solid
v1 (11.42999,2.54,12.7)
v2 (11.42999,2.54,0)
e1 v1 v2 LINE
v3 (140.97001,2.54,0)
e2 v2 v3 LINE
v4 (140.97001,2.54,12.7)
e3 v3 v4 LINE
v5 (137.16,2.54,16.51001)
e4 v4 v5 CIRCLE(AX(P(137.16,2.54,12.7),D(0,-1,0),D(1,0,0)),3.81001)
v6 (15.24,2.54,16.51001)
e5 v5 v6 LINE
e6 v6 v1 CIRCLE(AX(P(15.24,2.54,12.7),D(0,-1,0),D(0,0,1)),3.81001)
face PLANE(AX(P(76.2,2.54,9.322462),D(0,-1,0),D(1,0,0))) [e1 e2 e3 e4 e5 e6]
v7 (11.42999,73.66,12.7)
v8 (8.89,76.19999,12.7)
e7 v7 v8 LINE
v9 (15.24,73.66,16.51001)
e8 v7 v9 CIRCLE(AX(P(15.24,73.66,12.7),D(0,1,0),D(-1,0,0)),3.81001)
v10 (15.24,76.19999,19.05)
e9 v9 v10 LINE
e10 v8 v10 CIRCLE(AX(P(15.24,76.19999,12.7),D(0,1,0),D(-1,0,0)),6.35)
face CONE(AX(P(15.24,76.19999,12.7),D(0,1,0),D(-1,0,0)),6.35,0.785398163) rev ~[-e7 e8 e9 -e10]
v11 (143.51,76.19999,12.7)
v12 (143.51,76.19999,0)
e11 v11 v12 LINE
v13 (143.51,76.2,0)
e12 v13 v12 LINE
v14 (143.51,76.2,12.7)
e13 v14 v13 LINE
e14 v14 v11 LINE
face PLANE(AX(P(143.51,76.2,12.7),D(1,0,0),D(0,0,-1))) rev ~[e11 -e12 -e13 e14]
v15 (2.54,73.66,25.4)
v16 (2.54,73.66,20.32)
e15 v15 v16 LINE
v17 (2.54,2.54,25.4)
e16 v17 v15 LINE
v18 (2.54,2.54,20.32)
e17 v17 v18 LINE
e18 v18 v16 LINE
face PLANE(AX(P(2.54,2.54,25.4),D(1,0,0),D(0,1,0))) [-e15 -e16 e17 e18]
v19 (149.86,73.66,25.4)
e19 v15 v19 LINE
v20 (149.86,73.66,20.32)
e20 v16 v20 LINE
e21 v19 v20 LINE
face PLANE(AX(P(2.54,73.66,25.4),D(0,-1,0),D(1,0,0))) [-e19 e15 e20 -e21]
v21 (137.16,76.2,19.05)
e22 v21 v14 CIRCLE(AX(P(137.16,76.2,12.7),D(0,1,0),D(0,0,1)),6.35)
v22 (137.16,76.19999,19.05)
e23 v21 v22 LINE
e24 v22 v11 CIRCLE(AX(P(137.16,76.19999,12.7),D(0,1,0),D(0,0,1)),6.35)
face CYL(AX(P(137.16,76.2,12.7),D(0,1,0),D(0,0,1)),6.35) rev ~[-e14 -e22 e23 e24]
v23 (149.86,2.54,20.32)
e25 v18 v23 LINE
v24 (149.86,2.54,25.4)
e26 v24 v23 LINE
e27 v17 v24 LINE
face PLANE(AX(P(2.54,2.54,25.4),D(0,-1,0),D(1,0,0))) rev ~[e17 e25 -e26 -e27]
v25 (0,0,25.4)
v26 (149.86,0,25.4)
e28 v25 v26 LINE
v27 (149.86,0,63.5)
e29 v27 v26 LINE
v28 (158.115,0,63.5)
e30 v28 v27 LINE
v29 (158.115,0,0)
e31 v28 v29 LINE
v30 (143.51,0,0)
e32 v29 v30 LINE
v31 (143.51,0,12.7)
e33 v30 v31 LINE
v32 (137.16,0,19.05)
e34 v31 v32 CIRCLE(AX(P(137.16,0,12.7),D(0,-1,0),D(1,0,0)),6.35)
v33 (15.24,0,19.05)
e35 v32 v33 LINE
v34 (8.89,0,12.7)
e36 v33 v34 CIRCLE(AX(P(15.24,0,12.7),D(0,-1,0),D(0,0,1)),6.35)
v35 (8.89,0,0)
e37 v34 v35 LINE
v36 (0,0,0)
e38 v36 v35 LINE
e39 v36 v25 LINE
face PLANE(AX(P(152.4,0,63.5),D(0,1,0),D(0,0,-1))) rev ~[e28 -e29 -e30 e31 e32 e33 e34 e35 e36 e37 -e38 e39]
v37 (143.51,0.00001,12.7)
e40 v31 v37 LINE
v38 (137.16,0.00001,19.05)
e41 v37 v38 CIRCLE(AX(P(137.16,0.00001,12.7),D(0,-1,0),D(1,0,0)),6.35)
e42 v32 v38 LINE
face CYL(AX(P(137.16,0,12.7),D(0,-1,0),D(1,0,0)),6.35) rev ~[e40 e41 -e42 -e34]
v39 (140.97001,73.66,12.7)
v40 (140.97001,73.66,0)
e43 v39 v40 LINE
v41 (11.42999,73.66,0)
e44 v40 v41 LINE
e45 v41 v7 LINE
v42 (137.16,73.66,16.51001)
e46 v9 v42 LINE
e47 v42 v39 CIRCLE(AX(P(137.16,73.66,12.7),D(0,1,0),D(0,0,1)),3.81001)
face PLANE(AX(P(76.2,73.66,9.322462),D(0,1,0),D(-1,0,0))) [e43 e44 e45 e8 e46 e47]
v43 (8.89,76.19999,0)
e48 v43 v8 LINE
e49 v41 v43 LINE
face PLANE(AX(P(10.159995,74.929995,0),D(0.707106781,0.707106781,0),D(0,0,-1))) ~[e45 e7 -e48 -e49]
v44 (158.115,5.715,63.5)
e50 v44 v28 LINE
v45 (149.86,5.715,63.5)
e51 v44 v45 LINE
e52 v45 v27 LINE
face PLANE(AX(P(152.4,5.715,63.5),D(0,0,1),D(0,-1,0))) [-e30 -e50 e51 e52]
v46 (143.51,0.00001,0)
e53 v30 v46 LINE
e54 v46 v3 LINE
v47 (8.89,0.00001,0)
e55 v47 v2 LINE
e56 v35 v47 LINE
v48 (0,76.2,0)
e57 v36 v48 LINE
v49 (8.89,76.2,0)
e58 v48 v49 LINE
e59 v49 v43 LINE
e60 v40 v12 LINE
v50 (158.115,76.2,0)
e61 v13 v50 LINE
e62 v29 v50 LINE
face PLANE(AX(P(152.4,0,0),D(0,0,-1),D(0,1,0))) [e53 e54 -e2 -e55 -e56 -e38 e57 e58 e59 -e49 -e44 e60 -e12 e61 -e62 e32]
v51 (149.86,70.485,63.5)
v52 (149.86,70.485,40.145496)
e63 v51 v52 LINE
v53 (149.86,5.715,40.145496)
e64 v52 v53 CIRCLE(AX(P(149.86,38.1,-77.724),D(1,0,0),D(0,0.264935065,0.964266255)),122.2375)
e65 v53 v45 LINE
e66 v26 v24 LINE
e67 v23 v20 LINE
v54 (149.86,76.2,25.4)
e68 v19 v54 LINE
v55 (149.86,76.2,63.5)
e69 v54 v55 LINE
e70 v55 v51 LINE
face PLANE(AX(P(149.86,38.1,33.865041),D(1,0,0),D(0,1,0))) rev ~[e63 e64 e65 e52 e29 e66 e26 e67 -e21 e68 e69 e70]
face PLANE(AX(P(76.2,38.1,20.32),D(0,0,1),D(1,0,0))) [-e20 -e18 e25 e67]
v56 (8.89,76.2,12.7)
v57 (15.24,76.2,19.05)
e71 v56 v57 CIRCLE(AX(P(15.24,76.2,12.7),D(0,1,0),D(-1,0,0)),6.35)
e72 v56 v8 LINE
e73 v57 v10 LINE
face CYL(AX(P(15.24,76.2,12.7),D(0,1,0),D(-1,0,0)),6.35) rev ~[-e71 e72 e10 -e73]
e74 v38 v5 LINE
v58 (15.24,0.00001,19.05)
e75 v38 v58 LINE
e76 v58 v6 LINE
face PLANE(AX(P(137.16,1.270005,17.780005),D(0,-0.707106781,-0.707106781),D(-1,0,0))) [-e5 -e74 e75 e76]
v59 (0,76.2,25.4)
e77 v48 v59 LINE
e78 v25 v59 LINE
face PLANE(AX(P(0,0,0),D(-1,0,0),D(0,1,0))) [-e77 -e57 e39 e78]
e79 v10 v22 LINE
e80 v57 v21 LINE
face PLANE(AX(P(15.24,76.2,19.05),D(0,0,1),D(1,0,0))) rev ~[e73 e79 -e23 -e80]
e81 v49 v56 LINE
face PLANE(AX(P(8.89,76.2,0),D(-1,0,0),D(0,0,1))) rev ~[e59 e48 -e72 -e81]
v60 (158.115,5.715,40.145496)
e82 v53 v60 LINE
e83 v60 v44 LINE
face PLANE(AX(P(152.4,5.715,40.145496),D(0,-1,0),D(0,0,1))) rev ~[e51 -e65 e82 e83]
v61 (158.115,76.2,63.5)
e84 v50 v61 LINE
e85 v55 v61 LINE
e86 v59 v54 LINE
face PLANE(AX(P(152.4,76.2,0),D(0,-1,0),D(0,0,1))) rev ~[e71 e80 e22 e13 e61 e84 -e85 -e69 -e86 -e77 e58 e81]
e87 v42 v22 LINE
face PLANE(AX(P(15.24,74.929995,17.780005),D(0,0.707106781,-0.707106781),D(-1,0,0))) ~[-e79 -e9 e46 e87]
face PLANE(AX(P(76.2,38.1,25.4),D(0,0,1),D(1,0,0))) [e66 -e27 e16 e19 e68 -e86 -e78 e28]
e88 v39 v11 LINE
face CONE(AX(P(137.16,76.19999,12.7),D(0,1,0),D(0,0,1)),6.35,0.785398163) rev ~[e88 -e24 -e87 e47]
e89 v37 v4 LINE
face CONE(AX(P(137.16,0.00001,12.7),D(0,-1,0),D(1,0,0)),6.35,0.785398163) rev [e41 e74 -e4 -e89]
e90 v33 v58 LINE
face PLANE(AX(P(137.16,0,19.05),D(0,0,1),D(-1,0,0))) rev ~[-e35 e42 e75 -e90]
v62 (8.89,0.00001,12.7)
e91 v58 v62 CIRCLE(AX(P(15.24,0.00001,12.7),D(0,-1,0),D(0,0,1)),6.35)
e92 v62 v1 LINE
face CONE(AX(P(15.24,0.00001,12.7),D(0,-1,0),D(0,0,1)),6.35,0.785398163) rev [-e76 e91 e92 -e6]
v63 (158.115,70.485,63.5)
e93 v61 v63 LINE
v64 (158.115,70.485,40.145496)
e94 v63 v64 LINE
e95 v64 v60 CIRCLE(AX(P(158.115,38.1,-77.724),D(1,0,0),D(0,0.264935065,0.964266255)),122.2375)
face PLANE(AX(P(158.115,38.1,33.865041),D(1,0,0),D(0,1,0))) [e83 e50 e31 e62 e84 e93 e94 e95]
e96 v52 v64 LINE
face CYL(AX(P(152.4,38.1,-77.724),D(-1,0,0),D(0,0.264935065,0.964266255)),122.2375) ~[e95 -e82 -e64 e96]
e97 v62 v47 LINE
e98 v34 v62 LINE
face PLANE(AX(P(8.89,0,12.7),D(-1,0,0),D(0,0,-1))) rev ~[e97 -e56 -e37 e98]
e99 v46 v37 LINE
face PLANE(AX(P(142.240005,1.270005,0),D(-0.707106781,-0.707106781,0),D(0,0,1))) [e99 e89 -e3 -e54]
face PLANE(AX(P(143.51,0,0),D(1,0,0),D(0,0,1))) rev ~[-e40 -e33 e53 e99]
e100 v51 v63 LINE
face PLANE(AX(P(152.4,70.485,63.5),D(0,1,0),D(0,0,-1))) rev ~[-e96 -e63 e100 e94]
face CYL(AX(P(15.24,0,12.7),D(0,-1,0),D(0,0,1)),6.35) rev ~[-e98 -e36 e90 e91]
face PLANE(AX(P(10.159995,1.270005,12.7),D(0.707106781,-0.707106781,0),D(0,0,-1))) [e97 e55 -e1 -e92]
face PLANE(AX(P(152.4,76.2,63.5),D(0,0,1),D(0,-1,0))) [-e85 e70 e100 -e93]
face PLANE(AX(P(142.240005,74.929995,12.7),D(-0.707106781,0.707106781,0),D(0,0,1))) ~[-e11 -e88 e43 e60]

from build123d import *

# Parameters (mm, degrees)
F0_W           = 152.4
F0_H           = 76.2
F1_DEPTH       = 25.4
F2_W           = 147.32
F2_H           = 71.12
F3_DEPTH       = 5.08
F5_DEPTH       = 2.54
F6_SIZE        = 2.53999
F8_DEPTH       = 2.54
F9_SIZE        = 2.53999
F10_W          = 64.77
F10_H          = 25.4
F10_W_2        = 5.715
F11_DEPTH      = 5.715
F11_DEPTH_BACK = 2.54


# Not quite as in the source:
# - a fillet or chamfer is up to 0.001 mm smaller than in the source, because OpenCascade refuses the exact size


with BuildPart() as f1:
    # F0 (on Top) → F1 (new body)
    with BuildSketch(Plane.XY):
        with Locations((76.2, 38.1)):
            Rectangle(F0_W, F0_H)
    extrude(amount=F1_DEPTH)

    # F2 (on face) → F3 (cut)
    with BuildSketch(Plane.XY.offset(25.4)):
        with Locations((76.2, 38.1)):
            Rectangle(F2_W, F2_H)
    extrude(amount=-F3_DEPTH, mode=Mode.SUBTRACT)

    # F4 (on face) → F5 (cut)
    with BuildSketch(Plane.XZ):
        with BuildLine():
            Line((8.89, 12.7), (8.89, 0))
            Line((8.89, 0), (143.51, 0))
            Line((143.51, 0), (143.51, 12.7))
            ThreePointArc((143.51, 12.7), (141.6501280605, 17.1901280605), (137.16, 19.05))
            Line((137.16, 19.05), (15.24, 19.05))
            ThreePointArc((15.24, 19.05), (10.7498719395, 17.1901280605), (8.89, 12.7))
        make_face()
    extrude(amount=-F5_DEPTH, mode=Mode.SUBTRACT)

    # F6 (size 2.54 in the source; OpenCascade refuses exactly that, so slightly less here)
    f6_edges = [f1.edges().sort_by_distance(p)[0] for p in [
        (76.2, 2.54, 19.05),
    ]]
    chamfer(f6_edges, length=F6_SIZE)

    # F7 (on face) → F8 (cut)
    with BuildSketch(Plane(origin=(0, 76.2, 0), x_dir=(-1, 0, 0), z_dir=(0, 1, 0))):
        with BuildLine():
            Line((-143.51, 12.7), (-143.51, 0))
            Line((-143.51, 0), (-8.89, 0))
            Line((-8.89, 0), (-8.89, 12.7))
            ThreePointArc((-8.89, 12.7), (-10.7498719395, 17.1901280605), (-15.24, 19.05))
            Line((-15.24, 19.05), (-137.16, 19.05))
            ThreePointArc((-137.16, 19.05), (-141.6501280605, 17.1901280605), (-143.51, 12.7))
        make_face()
    extrude(amount=-F8_DEPTH, mode=Mode.SUBTRACT)

    # F9 (size 2.54 in the source; OpenCascade refuses exactly that, so slightly less here)
    f9_edges = [f1.edges().sort_by_distance(p)[0] for p in [
        (76.2, 73.66, 19.05),
    ]]
    chamfer(f9_edges, length=F9_SIZE)

    # F10 (on face) → F11 (join, two sides)
    with BuildSketch(Plane.YZ.offset(152.4)) as f11_sk:
        with BuildLine():
            Line((5.715, 40.1454963986), (5.715, 25.4))
            Line((5.715, 25.4), (70.485, 25.4))
            Line((70.485, 25.4), (70.485, 40.1454963986))
            ThreePointArc((70.485, 40.1454963986), (38.1, 44.5135), (5.715, 40.1454963986))
        make_face()
        with Locations((38.1, 12.7)):
            Rectangle(F10_W, F10_H)
        with Locations((2.8575, 12.7)):
            Rectangle(F10_W_2, F10_H)
        Polygon((0, 63.5), (0, 25.4), (5.715, 25.4), (5.715, 40.1454963986), (5.715, 63.5), align=None)
        Polygon((70.485, 40.1454963986), (70.485, 25.4), (76.2, 25.4), (76.2, 63.5), (70.485, 63.5), align=None)
        with Locations((73.3425, 12.7)):
            Rectangle(F10_W_2, F10_H)
    extrude(amount=F11_DEPTH)
    extrude(f11_sk.sketch, amount=-F11_DEPTH_BACK)


solid = f1.part
